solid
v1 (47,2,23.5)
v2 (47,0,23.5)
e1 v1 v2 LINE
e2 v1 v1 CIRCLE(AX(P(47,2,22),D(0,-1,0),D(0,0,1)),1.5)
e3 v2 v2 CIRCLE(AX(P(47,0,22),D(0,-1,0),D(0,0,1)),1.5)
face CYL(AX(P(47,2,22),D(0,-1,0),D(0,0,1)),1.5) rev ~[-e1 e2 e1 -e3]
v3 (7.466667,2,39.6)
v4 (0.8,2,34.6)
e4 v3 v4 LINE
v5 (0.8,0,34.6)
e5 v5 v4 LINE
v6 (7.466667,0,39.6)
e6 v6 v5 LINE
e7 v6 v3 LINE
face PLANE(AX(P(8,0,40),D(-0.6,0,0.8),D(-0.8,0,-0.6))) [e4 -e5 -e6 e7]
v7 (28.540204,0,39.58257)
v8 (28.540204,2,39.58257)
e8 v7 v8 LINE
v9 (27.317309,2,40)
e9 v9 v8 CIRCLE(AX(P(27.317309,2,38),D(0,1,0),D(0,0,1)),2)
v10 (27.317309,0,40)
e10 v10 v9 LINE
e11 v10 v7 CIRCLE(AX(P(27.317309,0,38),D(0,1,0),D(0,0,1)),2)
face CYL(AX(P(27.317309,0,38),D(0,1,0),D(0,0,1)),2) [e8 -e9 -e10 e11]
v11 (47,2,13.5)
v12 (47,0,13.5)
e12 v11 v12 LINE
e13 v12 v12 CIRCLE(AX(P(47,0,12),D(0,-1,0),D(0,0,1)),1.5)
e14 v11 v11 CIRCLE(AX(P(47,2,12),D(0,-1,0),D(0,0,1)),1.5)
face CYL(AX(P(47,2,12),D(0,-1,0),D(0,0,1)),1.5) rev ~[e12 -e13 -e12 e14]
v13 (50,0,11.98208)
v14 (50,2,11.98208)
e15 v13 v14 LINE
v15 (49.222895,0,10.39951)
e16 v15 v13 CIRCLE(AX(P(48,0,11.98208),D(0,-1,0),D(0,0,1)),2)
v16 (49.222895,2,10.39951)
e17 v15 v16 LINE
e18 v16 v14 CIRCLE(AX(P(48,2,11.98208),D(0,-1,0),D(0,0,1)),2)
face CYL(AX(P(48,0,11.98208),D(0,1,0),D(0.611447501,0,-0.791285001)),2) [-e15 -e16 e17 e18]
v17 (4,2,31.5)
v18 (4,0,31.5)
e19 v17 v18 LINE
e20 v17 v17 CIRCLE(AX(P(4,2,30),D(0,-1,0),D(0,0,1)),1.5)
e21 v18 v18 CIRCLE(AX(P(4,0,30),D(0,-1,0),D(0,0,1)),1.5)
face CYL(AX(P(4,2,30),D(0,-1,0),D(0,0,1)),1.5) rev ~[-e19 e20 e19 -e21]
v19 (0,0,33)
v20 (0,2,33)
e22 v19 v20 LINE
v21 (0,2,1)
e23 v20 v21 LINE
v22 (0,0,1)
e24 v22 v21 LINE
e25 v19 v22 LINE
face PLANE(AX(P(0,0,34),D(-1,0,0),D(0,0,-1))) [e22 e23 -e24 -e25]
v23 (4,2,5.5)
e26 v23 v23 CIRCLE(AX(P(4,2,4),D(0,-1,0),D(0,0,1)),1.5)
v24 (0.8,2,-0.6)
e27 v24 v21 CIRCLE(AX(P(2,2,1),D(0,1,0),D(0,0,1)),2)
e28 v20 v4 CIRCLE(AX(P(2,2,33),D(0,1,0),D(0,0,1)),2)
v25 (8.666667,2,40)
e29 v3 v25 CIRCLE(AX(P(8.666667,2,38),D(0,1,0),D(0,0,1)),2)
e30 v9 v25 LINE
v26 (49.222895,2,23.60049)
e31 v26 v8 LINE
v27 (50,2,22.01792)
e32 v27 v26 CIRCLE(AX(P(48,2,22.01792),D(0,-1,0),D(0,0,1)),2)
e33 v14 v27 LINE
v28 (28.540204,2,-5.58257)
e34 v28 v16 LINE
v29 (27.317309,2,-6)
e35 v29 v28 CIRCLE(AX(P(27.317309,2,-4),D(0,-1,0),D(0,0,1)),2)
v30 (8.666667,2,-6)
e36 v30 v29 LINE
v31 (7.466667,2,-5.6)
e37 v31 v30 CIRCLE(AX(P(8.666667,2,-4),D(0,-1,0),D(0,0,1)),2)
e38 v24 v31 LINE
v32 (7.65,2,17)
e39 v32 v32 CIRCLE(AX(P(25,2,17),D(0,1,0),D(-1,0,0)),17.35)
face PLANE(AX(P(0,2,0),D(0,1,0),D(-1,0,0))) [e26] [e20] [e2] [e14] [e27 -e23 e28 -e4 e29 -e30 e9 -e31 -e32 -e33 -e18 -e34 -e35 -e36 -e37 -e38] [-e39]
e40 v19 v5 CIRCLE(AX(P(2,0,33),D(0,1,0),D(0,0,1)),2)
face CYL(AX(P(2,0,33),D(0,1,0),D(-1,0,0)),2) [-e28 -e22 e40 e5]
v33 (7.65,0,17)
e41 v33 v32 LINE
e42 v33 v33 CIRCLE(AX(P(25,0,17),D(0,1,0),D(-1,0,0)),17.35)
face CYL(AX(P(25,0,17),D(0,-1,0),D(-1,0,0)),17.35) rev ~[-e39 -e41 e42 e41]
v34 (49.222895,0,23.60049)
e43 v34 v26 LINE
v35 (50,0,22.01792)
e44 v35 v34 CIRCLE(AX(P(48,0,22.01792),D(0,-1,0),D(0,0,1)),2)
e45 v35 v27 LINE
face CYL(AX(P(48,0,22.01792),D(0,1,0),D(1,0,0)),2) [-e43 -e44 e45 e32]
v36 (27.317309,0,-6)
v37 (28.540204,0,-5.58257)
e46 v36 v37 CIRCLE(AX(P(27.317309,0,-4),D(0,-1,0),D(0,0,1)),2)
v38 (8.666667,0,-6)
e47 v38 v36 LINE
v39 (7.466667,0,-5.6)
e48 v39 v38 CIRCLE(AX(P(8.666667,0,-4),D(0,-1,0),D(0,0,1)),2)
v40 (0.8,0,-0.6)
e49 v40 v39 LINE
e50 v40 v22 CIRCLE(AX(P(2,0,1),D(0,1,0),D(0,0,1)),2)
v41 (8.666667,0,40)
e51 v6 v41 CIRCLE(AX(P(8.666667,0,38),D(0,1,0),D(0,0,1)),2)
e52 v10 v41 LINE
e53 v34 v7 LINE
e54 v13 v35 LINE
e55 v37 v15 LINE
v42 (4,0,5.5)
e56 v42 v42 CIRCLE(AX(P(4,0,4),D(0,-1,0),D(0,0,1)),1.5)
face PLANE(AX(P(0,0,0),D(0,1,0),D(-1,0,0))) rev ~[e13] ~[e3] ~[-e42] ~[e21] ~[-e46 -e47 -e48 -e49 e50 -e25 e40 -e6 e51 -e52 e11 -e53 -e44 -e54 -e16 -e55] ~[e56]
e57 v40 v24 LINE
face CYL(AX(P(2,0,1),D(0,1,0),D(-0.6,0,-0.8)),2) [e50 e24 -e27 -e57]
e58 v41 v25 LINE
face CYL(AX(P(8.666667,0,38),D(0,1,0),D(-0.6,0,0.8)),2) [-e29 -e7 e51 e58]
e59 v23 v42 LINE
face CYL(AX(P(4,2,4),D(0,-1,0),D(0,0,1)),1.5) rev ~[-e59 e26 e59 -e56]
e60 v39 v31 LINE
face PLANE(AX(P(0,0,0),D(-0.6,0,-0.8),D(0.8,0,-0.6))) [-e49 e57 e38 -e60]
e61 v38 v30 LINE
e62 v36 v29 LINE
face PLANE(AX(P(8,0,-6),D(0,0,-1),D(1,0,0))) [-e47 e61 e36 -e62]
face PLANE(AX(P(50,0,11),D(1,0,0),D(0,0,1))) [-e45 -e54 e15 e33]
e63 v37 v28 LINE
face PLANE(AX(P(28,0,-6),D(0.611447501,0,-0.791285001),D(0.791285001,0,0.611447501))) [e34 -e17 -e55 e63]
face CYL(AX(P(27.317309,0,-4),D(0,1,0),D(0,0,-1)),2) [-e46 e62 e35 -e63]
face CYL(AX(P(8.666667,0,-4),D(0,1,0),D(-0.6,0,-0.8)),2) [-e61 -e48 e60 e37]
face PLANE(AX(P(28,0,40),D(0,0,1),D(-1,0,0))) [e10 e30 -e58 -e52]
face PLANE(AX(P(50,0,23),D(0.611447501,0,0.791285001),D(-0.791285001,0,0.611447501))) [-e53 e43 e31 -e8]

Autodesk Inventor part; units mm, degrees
ref_plane "YZ Plane" through (0, 0, 0) normal (1, 0, 0) x (0, 1, 0)
ref_plane "XZ Plane" through (0, 0, 0) normal (0, 1, 0) x (-1, 0, 0)
ref_plane "XY Plane" through (0, 0, 0) normal (0, 0, 1) x (1, 0, 0)
sketch "スケッチ8" plane through (0, 0, 0) normal (0, 1, 0) x (-1, 0, 0)
  line L0 (0, 0) -> (-8, -6)
  line L1 (-8, -6) -> (-28, -6)
  line L2 (-28, -6) -> (-50, 11)
  line L3 (-50, 11) -> (-50, 23)
  line L4 (-50, 23) -> (-28, 40)
  line L5 (-28, 40) -> (-8, 40)
  line L6 (-8, 40) -> (0, 34)
  line L7 (0, 34) -> (0, 0)
  circle A0 centre (-25, 17) radius 17.35
  dimension "d41" = 34
  dimension "d42" = 6
  dimension "d43" = 6
  dimension "d44" = 8
  dimension "d45" = 20
  dimension "d46" = 22
  dimension "d47" = 17
  dimension "d48" = 17
  dimension "d49" = 34.7
  dimension "d50" = 25
  dimension "d51" = 23
extrude "プレート6" add sketch "スケッチ8" along normal blind 2
sketch "スケッチ9" plane through (0, 2, 0) normal (0, 1, 0) x (1, 0, 0)
  line L0 (0, -34) -> (0, 0) projected
  line L1 (50, -11) -> (50, -23) projected
  point P0 (4, -4)
  point P1 (4, -30)
  point P2 (47, -22)
  point P3 (47, -12)
  dimension "d53" = 4
  dimension "d54" = 4
  dimension "d55" = 26
  dimension "d56" = 3
  dimension "d57" = 1
  dimension "d58" = 1
hole "穴1" at (4, 2, 4) at (4, 2, 30) at (47, 2, 22) at (47, 2, 12) direction (0, -1, 0) diameter 3 end through all
fillet "コーナーR1" radius 2 8 edges at (0, 1, 34) (8, 1, 40) (28, 1, 40) (50, 1, 23) (50, 1, 11) (28, 1, -6) (0, 1, 0) (8, 1, -6)
sketch "スケッチ10" plane through (49.2229, 0, 23.6005) normal (0.6114475, 0, 0.791285) x (0.791285, 0, -0.6114475)
  point P0 (-24.5189, 0)
equation "\"d64\" = Thickness"
equation "\"d52\" = Thickness"
equation "\"BendRadius\" = Thickness"
equation "\"BendReliefWidth\" = Thickness"
equation "\"BendReliefDepth\" = 0.5 * Thickness"
equation "\"CornerReliefSize\" = 4 * Thickness"
equation "\"MinimumRemnant\" = 2 * Thickness"
equation "\"TransitionRadius\" = BendRadius"
equation "\"JacobiRadiusSize\" = Thickness"
equation "\"GapSize\" = Thickness"
equation "\"Thickness\" = 2"
properties part number "trackball-cover" material "アルミニウム 6061"
